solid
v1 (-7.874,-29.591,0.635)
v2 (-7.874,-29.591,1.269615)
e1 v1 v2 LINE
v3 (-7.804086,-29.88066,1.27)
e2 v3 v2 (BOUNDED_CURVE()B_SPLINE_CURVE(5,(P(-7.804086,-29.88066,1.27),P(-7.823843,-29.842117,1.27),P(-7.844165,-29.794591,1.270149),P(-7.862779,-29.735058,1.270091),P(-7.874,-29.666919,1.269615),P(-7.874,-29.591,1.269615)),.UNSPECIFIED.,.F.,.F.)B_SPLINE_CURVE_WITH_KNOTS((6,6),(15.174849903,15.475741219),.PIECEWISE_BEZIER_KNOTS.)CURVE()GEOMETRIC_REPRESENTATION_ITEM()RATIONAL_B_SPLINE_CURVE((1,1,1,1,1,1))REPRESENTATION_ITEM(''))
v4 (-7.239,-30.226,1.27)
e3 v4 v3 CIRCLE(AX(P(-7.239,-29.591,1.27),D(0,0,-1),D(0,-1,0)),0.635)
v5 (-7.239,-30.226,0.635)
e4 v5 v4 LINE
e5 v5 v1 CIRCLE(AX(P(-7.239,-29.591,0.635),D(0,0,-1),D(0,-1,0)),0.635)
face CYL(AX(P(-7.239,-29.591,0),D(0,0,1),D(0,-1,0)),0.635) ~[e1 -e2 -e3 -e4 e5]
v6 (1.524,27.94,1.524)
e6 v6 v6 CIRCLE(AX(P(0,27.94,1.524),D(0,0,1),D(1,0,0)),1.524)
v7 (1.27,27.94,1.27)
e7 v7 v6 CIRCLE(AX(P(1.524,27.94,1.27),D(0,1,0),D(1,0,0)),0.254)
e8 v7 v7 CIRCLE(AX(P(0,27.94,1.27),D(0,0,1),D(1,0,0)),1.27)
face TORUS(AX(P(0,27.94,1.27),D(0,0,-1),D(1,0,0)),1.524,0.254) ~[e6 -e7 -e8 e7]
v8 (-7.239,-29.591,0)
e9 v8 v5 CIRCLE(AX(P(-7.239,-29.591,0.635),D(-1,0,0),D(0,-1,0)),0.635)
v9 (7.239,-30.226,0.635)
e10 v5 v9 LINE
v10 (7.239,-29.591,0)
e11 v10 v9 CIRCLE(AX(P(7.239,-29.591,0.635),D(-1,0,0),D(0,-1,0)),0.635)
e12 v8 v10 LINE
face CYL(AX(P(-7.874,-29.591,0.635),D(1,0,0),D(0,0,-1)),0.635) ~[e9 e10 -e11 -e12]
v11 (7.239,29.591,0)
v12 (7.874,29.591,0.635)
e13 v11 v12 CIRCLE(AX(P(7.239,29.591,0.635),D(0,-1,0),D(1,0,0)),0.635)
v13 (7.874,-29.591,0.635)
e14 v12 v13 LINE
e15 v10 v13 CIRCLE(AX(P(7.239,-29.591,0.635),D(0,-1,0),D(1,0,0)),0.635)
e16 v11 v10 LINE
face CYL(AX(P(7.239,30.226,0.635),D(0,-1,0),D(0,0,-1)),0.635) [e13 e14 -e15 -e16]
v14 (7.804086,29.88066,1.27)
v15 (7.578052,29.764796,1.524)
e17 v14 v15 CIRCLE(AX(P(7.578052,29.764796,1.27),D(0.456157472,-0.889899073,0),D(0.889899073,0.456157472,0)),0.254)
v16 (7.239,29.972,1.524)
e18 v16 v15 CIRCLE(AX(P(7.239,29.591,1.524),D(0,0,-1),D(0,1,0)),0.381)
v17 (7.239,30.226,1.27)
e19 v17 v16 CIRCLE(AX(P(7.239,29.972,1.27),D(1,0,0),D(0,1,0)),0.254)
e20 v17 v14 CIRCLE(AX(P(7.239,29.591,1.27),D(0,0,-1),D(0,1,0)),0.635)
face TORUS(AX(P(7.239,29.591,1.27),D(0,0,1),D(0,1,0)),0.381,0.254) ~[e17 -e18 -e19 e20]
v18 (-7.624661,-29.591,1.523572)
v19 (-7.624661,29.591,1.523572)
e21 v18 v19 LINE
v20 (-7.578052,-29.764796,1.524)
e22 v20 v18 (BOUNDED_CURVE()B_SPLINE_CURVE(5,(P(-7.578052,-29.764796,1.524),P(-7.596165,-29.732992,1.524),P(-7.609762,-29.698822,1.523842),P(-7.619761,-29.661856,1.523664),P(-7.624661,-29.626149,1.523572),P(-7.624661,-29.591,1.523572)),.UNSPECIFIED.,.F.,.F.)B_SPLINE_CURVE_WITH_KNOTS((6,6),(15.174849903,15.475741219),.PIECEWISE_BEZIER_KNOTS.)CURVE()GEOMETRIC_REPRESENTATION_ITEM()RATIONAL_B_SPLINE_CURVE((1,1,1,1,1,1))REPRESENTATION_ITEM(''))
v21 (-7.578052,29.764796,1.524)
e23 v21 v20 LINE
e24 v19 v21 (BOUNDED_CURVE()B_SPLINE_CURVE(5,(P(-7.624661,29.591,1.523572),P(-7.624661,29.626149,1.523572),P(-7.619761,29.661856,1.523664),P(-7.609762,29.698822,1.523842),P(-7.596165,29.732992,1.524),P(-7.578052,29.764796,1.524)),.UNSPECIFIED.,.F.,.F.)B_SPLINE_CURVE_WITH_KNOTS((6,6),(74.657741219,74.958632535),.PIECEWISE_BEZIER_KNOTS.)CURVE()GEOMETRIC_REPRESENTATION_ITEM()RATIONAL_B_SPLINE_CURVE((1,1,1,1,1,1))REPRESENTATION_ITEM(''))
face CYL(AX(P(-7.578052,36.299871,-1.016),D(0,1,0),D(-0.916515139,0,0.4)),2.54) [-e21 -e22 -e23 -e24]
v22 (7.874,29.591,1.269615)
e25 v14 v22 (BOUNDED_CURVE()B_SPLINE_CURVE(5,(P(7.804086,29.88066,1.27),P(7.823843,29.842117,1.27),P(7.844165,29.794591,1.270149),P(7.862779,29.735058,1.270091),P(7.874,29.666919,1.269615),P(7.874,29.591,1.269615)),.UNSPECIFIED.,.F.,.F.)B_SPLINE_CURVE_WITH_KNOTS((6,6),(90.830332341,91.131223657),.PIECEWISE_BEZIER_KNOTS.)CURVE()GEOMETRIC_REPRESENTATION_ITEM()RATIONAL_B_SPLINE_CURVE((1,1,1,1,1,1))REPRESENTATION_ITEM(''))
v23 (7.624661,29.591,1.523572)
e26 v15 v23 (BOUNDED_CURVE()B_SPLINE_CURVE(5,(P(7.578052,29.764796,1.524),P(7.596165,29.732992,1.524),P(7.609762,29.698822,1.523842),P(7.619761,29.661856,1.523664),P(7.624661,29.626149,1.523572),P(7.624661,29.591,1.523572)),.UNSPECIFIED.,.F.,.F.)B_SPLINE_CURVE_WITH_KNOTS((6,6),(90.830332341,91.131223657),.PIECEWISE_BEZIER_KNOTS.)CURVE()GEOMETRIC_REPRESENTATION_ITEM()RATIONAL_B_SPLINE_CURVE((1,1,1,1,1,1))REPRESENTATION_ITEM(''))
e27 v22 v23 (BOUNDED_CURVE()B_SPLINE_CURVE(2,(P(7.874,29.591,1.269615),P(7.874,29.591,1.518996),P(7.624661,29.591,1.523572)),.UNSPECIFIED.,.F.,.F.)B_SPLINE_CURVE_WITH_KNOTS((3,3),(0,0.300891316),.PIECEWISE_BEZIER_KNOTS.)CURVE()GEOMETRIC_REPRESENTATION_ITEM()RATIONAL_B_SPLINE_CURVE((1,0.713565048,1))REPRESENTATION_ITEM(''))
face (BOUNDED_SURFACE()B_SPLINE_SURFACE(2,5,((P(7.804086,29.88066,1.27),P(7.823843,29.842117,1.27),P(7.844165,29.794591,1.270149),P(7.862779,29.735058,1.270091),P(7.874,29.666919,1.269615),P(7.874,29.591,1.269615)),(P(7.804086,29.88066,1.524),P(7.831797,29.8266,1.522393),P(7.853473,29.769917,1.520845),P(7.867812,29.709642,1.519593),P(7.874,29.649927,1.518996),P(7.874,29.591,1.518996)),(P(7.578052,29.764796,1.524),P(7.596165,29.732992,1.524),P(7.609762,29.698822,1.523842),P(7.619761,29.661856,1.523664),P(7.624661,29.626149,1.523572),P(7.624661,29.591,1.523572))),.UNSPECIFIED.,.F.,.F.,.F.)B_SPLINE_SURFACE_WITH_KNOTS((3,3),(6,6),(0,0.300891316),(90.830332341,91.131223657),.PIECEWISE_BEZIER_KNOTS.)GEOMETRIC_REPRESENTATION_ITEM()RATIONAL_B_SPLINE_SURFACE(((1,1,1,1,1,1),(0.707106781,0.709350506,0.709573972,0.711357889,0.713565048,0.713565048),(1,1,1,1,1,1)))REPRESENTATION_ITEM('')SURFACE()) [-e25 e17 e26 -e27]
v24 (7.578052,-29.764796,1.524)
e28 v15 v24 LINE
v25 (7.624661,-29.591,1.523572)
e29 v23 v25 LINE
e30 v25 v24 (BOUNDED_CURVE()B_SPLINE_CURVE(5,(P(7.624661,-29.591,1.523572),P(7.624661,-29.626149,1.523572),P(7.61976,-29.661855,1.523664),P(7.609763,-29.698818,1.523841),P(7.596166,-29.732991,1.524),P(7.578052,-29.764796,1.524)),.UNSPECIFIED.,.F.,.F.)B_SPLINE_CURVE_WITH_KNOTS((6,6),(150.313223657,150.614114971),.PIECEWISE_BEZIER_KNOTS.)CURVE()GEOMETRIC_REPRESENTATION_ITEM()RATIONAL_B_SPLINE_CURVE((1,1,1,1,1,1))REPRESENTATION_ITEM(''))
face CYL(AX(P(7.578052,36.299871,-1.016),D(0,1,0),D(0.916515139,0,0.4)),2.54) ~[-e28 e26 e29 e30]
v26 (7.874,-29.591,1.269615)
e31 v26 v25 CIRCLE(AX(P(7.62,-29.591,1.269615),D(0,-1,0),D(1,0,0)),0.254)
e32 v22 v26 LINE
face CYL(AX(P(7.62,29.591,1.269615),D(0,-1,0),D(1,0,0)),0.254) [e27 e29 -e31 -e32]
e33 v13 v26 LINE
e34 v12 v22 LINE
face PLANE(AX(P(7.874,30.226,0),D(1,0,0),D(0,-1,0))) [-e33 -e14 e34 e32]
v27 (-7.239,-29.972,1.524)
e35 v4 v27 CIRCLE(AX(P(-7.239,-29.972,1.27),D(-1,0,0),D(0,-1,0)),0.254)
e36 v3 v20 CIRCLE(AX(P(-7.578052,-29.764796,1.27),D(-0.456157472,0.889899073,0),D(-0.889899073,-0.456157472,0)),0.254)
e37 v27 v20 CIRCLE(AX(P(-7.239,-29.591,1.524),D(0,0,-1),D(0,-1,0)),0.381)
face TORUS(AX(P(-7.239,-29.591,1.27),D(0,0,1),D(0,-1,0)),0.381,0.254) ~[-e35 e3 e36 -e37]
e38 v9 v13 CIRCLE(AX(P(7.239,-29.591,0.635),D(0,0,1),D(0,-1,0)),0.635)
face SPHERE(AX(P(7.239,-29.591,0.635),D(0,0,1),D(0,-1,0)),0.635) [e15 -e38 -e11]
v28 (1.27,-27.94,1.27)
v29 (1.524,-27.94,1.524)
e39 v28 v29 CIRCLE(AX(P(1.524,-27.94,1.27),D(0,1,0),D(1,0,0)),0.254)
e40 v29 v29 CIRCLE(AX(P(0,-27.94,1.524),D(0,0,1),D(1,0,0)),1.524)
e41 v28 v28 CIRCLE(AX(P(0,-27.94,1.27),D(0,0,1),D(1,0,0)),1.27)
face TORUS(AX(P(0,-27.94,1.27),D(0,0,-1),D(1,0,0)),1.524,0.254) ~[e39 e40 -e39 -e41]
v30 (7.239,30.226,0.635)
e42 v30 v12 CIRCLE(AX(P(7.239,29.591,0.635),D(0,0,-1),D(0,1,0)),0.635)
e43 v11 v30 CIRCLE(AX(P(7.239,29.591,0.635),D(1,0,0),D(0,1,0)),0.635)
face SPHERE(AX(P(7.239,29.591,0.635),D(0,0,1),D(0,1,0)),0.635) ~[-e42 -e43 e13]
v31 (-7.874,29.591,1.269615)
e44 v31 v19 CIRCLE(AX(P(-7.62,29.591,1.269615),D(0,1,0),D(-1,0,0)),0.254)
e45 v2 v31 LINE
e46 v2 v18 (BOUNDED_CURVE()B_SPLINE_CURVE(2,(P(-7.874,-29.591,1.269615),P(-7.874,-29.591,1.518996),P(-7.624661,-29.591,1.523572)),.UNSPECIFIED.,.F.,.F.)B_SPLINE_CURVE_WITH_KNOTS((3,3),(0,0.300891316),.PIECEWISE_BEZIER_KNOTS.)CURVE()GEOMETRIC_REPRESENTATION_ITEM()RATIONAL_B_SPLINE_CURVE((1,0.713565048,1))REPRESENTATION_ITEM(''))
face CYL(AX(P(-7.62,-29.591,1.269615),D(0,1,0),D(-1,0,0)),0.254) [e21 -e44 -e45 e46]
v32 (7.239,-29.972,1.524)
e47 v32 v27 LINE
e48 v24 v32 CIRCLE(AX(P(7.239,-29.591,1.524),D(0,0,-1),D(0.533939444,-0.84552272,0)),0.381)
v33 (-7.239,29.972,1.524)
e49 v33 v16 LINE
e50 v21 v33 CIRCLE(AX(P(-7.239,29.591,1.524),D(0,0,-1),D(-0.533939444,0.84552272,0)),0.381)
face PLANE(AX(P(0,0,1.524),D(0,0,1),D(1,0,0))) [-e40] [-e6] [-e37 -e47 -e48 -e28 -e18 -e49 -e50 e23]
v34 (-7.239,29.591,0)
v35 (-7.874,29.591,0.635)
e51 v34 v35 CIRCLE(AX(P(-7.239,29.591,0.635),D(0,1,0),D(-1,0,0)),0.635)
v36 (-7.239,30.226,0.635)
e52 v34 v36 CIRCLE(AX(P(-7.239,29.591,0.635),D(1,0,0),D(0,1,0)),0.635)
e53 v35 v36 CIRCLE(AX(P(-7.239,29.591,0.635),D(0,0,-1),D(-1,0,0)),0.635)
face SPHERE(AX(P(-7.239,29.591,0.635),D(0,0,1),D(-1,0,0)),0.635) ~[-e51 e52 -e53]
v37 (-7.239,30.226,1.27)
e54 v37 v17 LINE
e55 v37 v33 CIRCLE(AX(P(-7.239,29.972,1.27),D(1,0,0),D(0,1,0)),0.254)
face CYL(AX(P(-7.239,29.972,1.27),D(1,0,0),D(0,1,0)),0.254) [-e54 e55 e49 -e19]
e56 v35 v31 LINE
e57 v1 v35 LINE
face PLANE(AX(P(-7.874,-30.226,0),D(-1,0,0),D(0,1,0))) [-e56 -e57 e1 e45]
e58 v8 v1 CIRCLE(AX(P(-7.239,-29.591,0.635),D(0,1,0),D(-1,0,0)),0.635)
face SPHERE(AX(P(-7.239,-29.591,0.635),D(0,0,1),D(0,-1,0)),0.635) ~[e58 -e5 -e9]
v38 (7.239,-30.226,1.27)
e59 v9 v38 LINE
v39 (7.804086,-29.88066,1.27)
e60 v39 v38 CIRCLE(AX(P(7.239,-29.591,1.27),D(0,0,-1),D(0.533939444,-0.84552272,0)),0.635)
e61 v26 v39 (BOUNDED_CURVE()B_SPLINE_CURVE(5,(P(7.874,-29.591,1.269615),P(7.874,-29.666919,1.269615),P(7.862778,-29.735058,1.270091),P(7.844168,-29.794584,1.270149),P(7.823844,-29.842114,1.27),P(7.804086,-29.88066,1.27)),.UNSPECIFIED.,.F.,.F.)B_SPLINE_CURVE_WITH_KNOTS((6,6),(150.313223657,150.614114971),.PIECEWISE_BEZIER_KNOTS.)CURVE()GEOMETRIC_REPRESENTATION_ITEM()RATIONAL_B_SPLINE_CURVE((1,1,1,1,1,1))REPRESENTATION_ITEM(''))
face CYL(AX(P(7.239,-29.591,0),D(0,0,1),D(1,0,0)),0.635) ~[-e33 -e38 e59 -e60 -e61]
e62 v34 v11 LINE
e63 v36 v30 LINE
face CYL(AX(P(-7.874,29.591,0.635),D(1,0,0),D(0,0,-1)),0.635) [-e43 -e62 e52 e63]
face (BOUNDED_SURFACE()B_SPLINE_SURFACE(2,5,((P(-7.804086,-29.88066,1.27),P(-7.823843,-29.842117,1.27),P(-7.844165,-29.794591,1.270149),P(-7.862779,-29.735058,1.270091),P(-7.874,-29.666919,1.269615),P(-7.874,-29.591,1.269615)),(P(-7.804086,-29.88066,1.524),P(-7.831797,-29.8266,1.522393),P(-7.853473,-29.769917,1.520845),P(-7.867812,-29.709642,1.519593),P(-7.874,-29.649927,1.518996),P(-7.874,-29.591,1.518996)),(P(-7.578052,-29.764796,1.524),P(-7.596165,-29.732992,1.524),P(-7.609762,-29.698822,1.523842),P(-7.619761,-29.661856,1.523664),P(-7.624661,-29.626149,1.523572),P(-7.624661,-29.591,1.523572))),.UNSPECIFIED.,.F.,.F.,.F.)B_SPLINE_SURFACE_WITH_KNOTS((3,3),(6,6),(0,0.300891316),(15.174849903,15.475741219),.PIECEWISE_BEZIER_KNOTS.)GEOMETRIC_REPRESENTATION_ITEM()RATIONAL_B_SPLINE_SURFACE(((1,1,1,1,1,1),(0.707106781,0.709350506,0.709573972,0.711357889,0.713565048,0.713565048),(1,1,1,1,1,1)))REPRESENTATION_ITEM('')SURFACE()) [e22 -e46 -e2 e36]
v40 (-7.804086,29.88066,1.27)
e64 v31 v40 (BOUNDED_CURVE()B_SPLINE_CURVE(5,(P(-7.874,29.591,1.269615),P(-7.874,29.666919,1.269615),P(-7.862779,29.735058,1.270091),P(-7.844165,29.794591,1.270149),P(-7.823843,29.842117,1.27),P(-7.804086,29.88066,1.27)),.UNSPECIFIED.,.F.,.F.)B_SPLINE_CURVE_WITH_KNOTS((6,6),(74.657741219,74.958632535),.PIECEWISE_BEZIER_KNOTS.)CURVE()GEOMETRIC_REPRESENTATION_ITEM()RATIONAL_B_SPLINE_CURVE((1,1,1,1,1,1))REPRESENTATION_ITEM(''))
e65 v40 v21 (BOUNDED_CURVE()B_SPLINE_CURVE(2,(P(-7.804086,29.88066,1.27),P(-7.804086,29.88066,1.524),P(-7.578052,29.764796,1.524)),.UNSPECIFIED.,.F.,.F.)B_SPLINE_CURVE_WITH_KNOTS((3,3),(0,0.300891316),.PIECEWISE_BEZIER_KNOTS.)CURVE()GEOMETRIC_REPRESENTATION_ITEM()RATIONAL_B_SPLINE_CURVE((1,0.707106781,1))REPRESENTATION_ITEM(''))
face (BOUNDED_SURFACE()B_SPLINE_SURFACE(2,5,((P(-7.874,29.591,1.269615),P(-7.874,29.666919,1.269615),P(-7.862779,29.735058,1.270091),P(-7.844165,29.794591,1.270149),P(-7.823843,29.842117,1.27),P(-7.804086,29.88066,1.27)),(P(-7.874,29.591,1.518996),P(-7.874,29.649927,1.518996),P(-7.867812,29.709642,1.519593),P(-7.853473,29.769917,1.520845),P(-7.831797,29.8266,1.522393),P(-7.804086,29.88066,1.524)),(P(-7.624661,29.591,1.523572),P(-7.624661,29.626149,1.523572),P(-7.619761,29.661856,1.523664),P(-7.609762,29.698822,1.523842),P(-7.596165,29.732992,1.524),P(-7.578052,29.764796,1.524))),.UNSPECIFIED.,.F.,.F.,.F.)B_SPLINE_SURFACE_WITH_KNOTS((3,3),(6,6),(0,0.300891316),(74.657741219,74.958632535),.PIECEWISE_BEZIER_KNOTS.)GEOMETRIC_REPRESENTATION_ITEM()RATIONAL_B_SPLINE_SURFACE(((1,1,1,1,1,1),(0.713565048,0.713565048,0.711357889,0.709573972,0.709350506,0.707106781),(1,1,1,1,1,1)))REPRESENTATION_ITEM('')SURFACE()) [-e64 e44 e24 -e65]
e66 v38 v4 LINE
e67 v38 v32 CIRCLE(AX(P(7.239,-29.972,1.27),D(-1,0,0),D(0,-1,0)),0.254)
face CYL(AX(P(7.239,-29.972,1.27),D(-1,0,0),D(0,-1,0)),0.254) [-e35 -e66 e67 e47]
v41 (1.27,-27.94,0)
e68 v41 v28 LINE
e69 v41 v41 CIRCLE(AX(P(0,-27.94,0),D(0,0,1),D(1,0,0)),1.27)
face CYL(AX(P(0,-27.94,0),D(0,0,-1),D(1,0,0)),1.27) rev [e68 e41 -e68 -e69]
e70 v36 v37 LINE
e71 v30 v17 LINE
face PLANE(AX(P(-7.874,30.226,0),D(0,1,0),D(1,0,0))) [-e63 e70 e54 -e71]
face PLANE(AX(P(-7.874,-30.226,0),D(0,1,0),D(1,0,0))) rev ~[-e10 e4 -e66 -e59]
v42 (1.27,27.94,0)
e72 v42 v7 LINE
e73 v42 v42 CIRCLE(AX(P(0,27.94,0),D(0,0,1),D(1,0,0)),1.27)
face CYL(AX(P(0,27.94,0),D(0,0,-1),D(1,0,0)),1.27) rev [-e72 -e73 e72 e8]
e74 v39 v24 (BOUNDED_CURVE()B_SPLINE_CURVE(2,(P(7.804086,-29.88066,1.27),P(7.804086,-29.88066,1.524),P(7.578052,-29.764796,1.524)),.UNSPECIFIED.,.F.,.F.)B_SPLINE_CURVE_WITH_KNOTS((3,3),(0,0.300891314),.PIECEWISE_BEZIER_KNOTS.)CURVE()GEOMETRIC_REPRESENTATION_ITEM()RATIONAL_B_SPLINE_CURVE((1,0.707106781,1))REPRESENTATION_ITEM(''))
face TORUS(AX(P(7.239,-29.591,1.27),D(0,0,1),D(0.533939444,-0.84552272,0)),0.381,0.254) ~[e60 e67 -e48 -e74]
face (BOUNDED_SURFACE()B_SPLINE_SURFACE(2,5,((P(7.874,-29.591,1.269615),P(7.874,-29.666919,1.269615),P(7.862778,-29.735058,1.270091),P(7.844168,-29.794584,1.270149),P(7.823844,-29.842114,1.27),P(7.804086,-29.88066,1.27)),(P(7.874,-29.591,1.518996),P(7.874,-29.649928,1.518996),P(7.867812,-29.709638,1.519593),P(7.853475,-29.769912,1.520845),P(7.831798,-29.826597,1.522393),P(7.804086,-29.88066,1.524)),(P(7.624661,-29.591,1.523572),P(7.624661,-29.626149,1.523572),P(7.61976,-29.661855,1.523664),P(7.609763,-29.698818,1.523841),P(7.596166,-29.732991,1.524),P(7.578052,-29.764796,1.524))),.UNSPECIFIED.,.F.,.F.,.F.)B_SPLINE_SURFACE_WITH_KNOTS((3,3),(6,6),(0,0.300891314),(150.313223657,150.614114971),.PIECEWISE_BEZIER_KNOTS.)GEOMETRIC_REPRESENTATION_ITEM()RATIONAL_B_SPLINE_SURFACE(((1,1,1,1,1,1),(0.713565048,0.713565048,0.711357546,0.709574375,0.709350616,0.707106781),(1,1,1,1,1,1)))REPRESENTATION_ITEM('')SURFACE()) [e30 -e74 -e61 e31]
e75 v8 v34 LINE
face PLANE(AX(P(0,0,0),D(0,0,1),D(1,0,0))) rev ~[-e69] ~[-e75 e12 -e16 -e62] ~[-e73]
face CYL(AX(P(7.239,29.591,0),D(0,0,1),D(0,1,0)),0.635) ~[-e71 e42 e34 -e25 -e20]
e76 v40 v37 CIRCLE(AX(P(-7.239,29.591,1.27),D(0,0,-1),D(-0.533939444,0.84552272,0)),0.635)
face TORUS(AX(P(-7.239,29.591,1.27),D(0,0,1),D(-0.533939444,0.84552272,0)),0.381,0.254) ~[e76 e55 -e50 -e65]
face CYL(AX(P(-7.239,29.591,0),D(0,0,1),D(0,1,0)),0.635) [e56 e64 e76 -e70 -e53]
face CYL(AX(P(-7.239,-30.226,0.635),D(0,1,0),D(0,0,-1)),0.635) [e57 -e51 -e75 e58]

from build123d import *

# Parameters (mm, degrees)
F0_W        = 16.002
F0_H        = 60.96
F0_R        = 1.27
F0_W_2      = 1.905
F1_DEPTH    = 1.524
F2_T1_DEPTH = 72.5997422652
F3_W        = 15.748
F3_H        = 0.254
F4_DEPTH    = 25.4
F5_R        = 0.635
F6_R        = 0.254


# Not quite as in the source:
# - a fillet or chamfer that OpenCascade refuses, or shapes differently, is made with other operations: its cross-section is extruded or revolved along the edge and cut away or added


with BuildPart() as f1:
    # F0 (on Top) → F1 (new body)
    with BuildSketch(Plane.XY):
        Rectangle(F0_W, F0_H)
        with Locations((0, -27.94)):
            Circle(F0_R, mode=Mode.SUBTRACT)
        with Locations((0, 27.94)):
            Circle(F0_R, mode=Mode.SUBTRACT)
        with Locations((-8.9535, 0)):
            Rectangle(F0_W_2, F0_H)
        with Locations((8.9535, 0)):
            Rectangle(F0_W_2, F0_H)
    extrude(amount=F1_DEPTH)

    # F2: fillet of radius 2.54 on 2 edges, made by hand

    # F2_s2 → F2_t1 (cut)
    with BuildSketch(Plane.XZ.offset(-36.2998711326)):
        with BuildLine():
            ThreePointArc((-9.906, 0), (-8.969266843, 1.1091164674), (-7.578051547, 1.524))
            Line((-7.578051547, 1.524), (-9.906, 1.524))
            Line((-9.906, 1.524), (-9.906, 0))
        make_face()
        with BuildLine():
            ThreePointArc((9.906, 0), (8.969266843, 1.1091164674), (7.578051547, 1.524))
            Line((7.578051547, 1.524), (9.906, 1.524))
            Line((9.906, 1.524), (9.906, 0))
        make_face()
    extrude(amount=F2_T1_DEPTH, mode=Mode.SUBTRACT)

    # F3 (on Top) → F4 (cut)
    with BuildSketch(Plane.XY):
        with Locations((0, 30.353)):
            Rectangle(F3_W, F3_H)
        Polygon((11.6183462764, 30.48), (7.874, 30.48), (7.874, 30.226), (7.874, -30.226), (7.874, -30.48), (11.6183462764, -30.48), align=None)
        Polygon((-7.874, 30.226), (-7.874, 30.48), (-11.6183462764, 30.48), (-11.6183462764, -30.48), (-7.874, -30.48), (-7.874, -30.226), align=None)
        with Locations((0, -30.353)):
            Rectangle(F3_W, F3_H)
    extrude(amount=F4_DEPTH, mode=Mode.SUBTRACT)

    # F5
    f5_edges = [f1.edges().sort_by_distance(p)[0] for p in [
        (-7.874, 30.226, 0.75335),
        (7.874, 30.226, 0.75335),
        (-7.874, -30.226, 0.75335),
        (7.874, -30.226, 0.75335),
        (0, -30.226, 0),
        (-7.874, 0, 0),
        (0, 30.226, 0),
        (7.874, 0, 0),
    ]]
    fillet(f5_edges, radius=F5_R)

    # F6
    f6_edges = [f1.edges().sort_by_distance(p)[0] for p in [
        (0, -30.226, 1.524),
        (-1.27, -27.94, 1.524),
        (-1.27, 27.94, 1.524),
        (7.874, 0, 1.5067),
        (-7.874, 0, 1.5067),
        (0, 30.226, 1.524),
        (7.415478, 30.200984, 1.524),
        (7.415478, -30.200984, 1.524),
        (-7.415478, 30.200984, 1.524),
        (-7.415478, -30.200984, 1.524),
        (7.798093, -29.892064, 1.514451),
        (-7.798115, -29.892025, 1.514449),
        (7.798115, 29.892025, 1.514449),
        (-7.798115, 29.892025, 1.514449),
    ]]
    fillet(f6_edges, radius=F6_R)


solid = f1.part
